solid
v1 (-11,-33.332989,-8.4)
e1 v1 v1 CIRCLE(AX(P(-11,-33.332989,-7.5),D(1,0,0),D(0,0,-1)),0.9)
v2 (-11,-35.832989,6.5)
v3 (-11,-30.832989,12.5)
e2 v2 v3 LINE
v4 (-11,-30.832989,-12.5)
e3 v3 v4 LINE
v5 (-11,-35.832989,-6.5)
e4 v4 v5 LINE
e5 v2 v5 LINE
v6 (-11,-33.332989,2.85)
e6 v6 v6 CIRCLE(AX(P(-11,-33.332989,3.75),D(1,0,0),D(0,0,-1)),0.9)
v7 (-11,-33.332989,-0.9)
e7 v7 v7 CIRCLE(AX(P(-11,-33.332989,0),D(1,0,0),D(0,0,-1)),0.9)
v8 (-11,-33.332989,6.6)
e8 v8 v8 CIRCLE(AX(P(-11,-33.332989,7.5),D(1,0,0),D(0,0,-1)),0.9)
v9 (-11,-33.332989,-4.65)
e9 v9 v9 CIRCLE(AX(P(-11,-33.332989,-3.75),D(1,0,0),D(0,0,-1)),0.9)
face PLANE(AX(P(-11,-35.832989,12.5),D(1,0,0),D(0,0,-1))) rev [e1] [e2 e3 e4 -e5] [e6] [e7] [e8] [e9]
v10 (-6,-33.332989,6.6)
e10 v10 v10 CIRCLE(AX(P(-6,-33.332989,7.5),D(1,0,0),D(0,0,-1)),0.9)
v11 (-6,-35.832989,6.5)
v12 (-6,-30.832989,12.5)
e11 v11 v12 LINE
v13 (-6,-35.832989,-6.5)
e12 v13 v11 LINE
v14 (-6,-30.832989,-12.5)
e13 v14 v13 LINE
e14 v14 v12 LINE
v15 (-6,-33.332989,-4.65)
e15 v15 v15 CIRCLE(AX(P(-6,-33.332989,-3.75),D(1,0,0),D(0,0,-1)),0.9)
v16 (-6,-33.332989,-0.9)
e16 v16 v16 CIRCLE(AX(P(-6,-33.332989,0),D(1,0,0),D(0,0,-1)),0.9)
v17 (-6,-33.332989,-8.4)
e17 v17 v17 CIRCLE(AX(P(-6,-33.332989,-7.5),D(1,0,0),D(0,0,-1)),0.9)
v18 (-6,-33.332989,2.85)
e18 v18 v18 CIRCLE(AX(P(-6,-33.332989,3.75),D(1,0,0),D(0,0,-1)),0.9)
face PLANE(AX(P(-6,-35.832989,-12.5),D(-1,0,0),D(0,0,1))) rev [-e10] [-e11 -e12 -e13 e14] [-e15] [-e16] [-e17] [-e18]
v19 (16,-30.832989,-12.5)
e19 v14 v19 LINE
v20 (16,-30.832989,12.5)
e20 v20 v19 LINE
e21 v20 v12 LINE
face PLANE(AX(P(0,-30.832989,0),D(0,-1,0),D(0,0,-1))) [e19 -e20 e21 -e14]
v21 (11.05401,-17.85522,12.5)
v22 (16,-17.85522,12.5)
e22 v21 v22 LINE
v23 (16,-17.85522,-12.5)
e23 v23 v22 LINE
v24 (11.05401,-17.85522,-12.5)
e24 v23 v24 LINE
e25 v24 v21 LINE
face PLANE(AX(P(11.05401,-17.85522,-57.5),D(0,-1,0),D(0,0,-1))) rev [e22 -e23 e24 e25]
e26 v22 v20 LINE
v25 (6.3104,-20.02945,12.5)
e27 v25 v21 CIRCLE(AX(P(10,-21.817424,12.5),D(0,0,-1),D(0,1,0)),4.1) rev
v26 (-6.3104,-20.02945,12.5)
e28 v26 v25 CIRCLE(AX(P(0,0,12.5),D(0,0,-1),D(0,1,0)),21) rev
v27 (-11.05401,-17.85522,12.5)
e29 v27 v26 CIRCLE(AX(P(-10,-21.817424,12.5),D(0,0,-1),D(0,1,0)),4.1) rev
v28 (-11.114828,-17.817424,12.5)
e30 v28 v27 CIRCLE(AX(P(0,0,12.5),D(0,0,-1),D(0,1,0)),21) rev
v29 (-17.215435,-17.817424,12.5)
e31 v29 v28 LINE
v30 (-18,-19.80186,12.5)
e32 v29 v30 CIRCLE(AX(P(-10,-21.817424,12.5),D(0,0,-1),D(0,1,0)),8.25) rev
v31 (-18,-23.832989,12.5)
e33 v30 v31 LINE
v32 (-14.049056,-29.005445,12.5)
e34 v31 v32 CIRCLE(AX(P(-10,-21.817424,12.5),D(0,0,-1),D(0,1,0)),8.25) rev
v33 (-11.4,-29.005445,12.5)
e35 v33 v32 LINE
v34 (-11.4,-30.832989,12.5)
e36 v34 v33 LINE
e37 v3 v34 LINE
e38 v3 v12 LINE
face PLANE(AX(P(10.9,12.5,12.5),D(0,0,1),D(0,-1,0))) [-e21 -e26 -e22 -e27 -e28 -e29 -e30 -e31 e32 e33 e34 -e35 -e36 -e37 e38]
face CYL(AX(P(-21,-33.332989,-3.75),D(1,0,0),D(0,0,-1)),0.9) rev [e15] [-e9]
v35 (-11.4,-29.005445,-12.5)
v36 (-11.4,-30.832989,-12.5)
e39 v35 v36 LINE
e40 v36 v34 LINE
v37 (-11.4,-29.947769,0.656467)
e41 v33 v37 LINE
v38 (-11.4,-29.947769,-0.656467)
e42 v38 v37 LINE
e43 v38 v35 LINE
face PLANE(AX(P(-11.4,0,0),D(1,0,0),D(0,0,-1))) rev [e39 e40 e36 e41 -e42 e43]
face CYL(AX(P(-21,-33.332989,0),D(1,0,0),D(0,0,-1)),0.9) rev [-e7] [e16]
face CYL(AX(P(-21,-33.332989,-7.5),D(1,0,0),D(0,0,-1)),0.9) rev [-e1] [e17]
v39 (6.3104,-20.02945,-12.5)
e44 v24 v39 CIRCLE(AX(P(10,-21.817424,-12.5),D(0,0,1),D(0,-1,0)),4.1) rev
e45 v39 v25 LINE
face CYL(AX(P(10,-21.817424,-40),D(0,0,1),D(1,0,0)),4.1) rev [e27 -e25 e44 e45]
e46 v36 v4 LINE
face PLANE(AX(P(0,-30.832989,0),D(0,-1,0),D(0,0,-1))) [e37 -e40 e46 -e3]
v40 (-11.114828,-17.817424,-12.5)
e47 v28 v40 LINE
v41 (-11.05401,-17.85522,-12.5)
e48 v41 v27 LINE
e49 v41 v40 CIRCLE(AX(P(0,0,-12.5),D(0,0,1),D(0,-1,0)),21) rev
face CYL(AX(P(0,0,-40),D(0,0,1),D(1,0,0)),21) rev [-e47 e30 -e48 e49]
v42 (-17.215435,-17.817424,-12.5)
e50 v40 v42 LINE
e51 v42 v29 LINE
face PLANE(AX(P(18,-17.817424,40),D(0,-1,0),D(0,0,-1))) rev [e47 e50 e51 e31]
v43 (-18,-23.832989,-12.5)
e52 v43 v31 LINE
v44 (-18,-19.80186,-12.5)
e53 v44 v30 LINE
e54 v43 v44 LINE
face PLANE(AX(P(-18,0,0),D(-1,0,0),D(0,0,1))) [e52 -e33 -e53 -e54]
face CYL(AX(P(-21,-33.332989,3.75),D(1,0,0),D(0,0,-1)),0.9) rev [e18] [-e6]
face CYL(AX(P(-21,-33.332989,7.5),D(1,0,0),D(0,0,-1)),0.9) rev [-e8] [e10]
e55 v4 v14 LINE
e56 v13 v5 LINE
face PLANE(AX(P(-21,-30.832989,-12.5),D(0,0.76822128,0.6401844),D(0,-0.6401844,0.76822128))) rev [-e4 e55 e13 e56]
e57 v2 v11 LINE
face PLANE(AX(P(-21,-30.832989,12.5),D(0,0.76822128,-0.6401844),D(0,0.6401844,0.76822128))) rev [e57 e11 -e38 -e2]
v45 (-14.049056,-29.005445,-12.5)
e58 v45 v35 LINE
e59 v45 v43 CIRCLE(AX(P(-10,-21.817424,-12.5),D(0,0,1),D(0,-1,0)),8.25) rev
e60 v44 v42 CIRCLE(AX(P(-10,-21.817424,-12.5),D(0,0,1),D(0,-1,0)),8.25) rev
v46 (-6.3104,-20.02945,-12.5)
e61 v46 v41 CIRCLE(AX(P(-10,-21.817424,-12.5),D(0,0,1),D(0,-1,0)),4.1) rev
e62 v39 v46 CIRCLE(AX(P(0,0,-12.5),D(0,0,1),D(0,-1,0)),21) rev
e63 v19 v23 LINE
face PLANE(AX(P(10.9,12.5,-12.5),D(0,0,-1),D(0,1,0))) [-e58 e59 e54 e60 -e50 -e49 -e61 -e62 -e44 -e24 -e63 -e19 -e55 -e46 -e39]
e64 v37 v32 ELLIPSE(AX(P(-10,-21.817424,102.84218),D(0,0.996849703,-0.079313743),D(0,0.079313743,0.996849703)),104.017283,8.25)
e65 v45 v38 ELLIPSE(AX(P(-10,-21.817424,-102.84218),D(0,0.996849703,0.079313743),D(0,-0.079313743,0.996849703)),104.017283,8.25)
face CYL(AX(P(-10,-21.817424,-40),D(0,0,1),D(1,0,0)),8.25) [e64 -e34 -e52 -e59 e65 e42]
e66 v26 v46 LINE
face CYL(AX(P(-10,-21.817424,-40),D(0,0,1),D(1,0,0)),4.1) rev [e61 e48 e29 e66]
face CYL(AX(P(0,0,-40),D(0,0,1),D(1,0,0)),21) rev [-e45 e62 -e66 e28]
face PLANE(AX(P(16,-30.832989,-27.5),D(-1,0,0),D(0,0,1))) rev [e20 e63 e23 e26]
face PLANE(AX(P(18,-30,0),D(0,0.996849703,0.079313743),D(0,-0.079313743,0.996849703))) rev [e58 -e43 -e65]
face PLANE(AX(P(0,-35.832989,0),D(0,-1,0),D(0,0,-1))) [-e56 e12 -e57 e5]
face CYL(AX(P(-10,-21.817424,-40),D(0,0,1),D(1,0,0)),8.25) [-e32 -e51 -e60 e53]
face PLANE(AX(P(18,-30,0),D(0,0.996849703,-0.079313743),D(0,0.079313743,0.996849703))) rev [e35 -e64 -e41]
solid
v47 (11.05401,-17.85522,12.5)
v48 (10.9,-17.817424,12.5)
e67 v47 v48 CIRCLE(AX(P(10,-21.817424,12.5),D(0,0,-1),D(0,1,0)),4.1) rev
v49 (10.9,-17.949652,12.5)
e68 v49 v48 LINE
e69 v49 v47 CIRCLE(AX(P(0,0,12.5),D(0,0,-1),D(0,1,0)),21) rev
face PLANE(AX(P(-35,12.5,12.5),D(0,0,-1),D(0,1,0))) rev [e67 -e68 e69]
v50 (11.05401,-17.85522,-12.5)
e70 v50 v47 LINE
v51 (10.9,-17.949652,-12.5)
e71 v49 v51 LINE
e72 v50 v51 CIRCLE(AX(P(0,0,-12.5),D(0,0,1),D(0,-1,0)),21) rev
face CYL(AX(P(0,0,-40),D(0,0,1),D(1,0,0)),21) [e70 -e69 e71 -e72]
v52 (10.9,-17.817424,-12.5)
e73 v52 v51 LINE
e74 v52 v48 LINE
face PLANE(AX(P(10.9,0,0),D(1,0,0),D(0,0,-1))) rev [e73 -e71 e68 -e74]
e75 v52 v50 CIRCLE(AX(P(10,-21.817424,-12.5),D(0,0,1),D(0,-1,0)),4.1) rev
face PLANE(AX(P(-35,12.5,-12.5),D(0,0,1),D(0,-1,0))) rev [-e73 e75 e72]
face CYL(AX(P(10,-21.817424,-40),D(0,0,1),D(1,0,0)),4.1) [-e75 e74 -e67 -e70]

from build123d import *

# Parameters (mm, degrees)
BOSS_EXTRUDE1_DEPTH = 18
CUT_EXTRUDE3_DEPTH  = 88.315519812
BOSS_EXTRUDE2_DEPTH = 15.1
CUT_EXTRUDE5_START  = -40
CUT_EXTRUDE5_DEPTH  = 80
SKETCH11_W          = 45
SKETCH11_H          = 50
CUT_EXTRUDE8_DEPTH  = 35
SKETCH12_W          = 14.945990499
SKETCH12_H          = 30.355219796
CUT_EXTRUDE9_DEPTH  = 70
SKETCH13_W          = 12.4
SKETCH13_H          = 25
BOSS_EXTRUDE3_DEPTH = 7
SKETCH14_W          = 10
SKETCH14_H          = 12.97776887
CUT_EXTRUDE10_DEPTH = 40
SKETCH15_W          = 25
SKETCH15_H          = 1.827543594
BOSS_EXTRUDE4_DEPTH = 25
SKETCH17_W          = 5
SKETCH17_H          = 25
BOSS_EXTRUDE5_DEPTH = 5
CUT_EXTRUDE11_DEPTH = 15
SKETCH19_R          = 0.9
CUT_EXTRUDE12_DEPTH = 15


# Read off the part's stored shape, not the designer's step: Cut-Extrude5
with BuildPart() as part:
    # Sketch2 → Boss-Extrude1 (new, symmetric)
    with BuildSketch(Plane(origin=(0, 0, 0), x_dir=(0, 0, -1), z_dir=(1, 0, 0))):
        Polygon((-40, -26.817424229), (-40, -17.817424229), (40, -17.817424229), (40, -26.817424229), (0, -30), align=None)
    extrude(amount=BOSS_EXTRUDE1_DEPTH, both=True)

    # Sketch3 → Cut-Extrude3 (cut, through all)
    with BuildSketch(Plane.XY.offset(40)):
        with BuildLine():
            Line((-16.562202374, -26.817424229), (-18, -26.817424229))
            Line((-18, -26.817424229), (-18, -30.067424229))
            Line((-18, -30.067424229), (-10, -30.067424229))
            ThreePointArc((-10, -30.067424229), (-13.661454629, -29.210410771), (-16.562202374, -26.817424229))
        make_face()
        with BuildLine():
            ThreePointArc((-16.562202374, -26.817424229), (-17.432438927, -25.398115726), (-18, -23.832988666))
            Line((-18, -23.832988666), (-18, -26.817424229))
            Line((-18, -26.817424229), (-16.562202374, -26.817424229))
        make_face()
        with BuildLine():
            Line((-17.215434845, -17.817424229), (-18, -17.817424229))
            Line((-18, -17.817424229), (-18, -19.801859792))
            ThreePointArc((-18, -19.801859792), (-17.672148363, -18.784168636), (-17.215434845, -17.817424229))
        make_face()
        with BuildLine():
            ThreePointArc((16.562202374, -26.817424229), (13.661454629, -29.210410771), (10, -30.067424229))
            Line((10, -30.067424229), (18, -30.067424229))
            Line((18, -30.067424229), (18, -26.817424229))
            Line((18, -26.817424229), (16.562202374, -26.817424229))
        make_face()
        with BuildLine():
            ThreePointArc((10.138510435, -17.817424229), (10.216403484, -17.772875396), (10.294100789, -17.727986037))
            ThreePointArc((10.294100789, -17.727986037), (9.693767636, -17.728876597), (9.1, -17.817424229))
            Line((9.1, -17.817424229), (10.138510435, -17.817424229))
        make_face()
        with BuildLine():
            ThreePointArc((10.9, -17.817424229), (10.598722783, -17.761375533), (10.294100789, -17.727986037))
            ThreePointArc((10.294100789, -17.727986037), (10.216403484, -17.772875396), (10.138510435, -17.817424229))
            Line((10.138510435, -17.817424229), (10.9, -17.817424229))
        make_face()
        with BuildLine():
            Line((10.138510435, -17.817424229), (9.1, -17.817424229))
            ThreePointArc((9.1, -17.817424229), (7.76570517, -18.379703093), (6.710065877, -19.370725746))
            ThreePointArc((6.710065877, -19.370725746), (8.460012845, -18.672926462), (10.138510435, -17.817424229))
        make_face()
        with BuildLine():
            ThreePointArc((14.1, -21.817424229), (13.201562119, -19.256174534), (10.9, -17.817424229))
            Line((10.9, -17.817424229), (10.138510435, -17.817424229))
            ThreePointArc((10.138510435, -17.817424229), (8.460012845, -18.672926462), (6.710065877, -19.370725746))
            ThreePointArc((6.710065877, -19.370725746), (8.711343704, -25.709642742), (14.1, -21.817424229))
        make_face()
        with BuildLine():
            Line((-10.138510435, -17.817424229), (-10.9, -17.817424229))
            ThreePointArc((-10.9, -17.817424229), (-12.561249695, -25.018986348), (-5.9, -21.817424229))
            ThreePointArc((-5.9, -21.817424229), (-6.107781487, -20.528767934), (-6.710065877, -19.370725746))
            ThreePointArc((-6.710065877, -19.370725746), (-8.460012845, -18.672926462), (-10.138510435, -17.817424229))
        make_face()
        with BuildLine():
            ThreePointArc((-10.294100789, -17.727986037), (-10.598722783, -17.761375533), (-10.9, -17.817424229))
            Line((-10.9, -17.817424229), (-10.138510435, -17.817424229))
            ThreePointArc((-10.138510435, -17.817424229), (-10.216403484, -17.772875396), (-10.294100789, -17.727986037))
        make_face()
        with BuildLine():
            ThreePointArc((-9.1, -17.817424229), (-9.693767636, -17.728876597), (-10.294100789, -17.727986037))
            ThreePointArc((-10.294100789, -17.727986037), (-10.216403484, -17.772875396), (-10.138510435, -17.817424229))
            Line((-10.138510435, -17.817424229), (-9.1, -17.817424229))
        make_face()
        with BuildLine():
            Line((-9.1, -17.817424229), (-10.138510435, -17.817424229))
            ThreePointArc((-10.138510435, -17.817424229), (-8.460012845, -18.672926462), (-6.710065877, -19.370725746))
            ThreePointArc((-6.710065877, -19.370725746), (-7.76570517, -18.379703093), (-9.1, -17.817424229))
        make_face()
        with BuildLine():
            ThreePointArc((18, -23.832988666), (17.432438927, -25.398115726), (16.562202374, -26.817424229))
            Line((16.562202374, -26.817424229), (18, -26.817424229))
            Line((18, -26.817424229), (18, -23.832988666))
        make_face()
        with BuildLine():
            ThreePointArc((-14.244209612, -14.742879384), (-15.932458957, -16.084324655), (-17.215434845, -17.817424229))
            Line((-17.215434845, -17.817424229), (-10.9, -17.817424229))
            ThreePointArc((-10.9, -17.817424229), (-10.598722783, -17.761375533), (-10.294100789, -17.727986037))
            ThreePointArc((-10.294100789, -17.727986037), (-12.359606983, -16.355125045), (-14.244209612, -14.742879384))
        make_face()
        with BuildLine():
            ThreePointArc((-2.784565155, -17.817424229), (-7.86218538, -13.849221882), (-14.244209612, -14.742879384))
            ThreePointArc((-14.244209612, -14.742879384), (-12.359606983, -16.355125045), (-10.294100789, -17.727986037))
            ThreePointArc((-10.294100789, -17.727986037), (-9.693767636, -17.728876597), (-9.1, -17.817424229))
            Line((-9.1, -17.817424229), (-2.784565155, -17.817424229))
        make_face()
        with BuildLine():
            ThreePointArc((-1.870156707, -20.414517234), (-2.21825127, -19.077554396), (-2.784565155, -17.817424229))
            Line((-2.784565155, -17.817424229), (-9.1, -17.817424229))
            ThreePointArc((-9.1, -17.817424229), (-7.76570517, -18.379703093), (-6.710065877, -19.370725746))
            ThreePointArc((-6.710065877, -19.370725746), (-4.321739241, -20.039275684), (-1.870156707, -20.414517234))
        make_face()
        with BuildLine():
            ThreePointArc((20.5, 0), (-8.007612096, 18.871357888), (-14.244209612, -14.742879384))
            ThreePointArc((-14.244209612, -14.742879384), (-7.86218538, -13.849221882), (-2.784565155, -17.817424229))
            Line((-2.784565155, -17.817424229), (2.784565155, -17.817424229))
            ThreePointArc((2.784565155, -17.817424229), (7.86218538, -13.849221882), (14.244209612, -14.742879384))
            ThreePointArc((14.244209612, -14.742879384), (18.871357888, -8.007612096), (20.5, 0))
        make_face()
        with BuildLine():
            Line((2.784565155, -17.817424229), (-2.784565155, -17.817424229))
            ThreePointArc((-2.784565155, -17.817424229), (-2.21825127, -19.077554396), (-1.870156707, -20.414517234))
            ThreePointArc((-1.870156707, -20.414517234), (0, -20.5), (1.870156707, -20.414517234))
            ThreePointArc((1.870156707, -20.414517234), (2.21825127, -19.077554396), (2.784565155, -17.817424229))
        make_face()
        with BuildLine():
            ThreePointArc((17.215434845, -17.817424229), (15.932458957, -16.084324655), (14.244209612, -14.742879384))
            ThreePointArc((14.244209612, -14.742879384), (12.359606983, -16.355125045), (10.294100789, -17.727986037))
            ThreePointArc((10.294100789, -17.727986037), (10.598722783, -17.761375533), (10.9, -17.817424229))
            Line((10.9, -17.817424229), (17.215434845, -17.817424229))
        make_face()
        with BuildLine():
            ThreePointArc((10.294100789, -17.727986037), (12.359606983, -16.355125045), (14.244209612, -14.742879384))
            ThreePointArc((14.244209612, -14.742879384), (7.86218538, -13.849221882), (2.784565155, -17.817424229))
            Line((2.784565155, -17.817424229), (9.1, -17.817424229))
            ThreePointArc((9.1, -17.817424229), (9.693767636, -17.728876597), (10.294100789, -17.727986037))
        make_face()
        with BuildLine():
            Line((9.1, -17.817424229), (2.784565155, -17.817424229))
            ThreePointArc((2.784565155, -17.817424229), (2.21825127, -19.077554396), (1.870156707, -20.414517234))
            ThreePointArc((1.870156707, -20.414517234), (4.321739241, -20.039275684), (6.710065877, -19.370725746))
            ThreePointArc((6.710065877, -19.370725746), (7.76570517, -18.379703093), (9.1, -17.817424229))
        make_face()
    extrude(amount=-CUT_EXTRUDE3_DEPTH, mode=Mode.SUBTRACT)

    # Sketch5 → Boss-Extrude2 (add)
    with BuildSketch(Plane(origin=(26, 0, 0), x_dir=(0, 0, -1), z_dir=(1, 0, 0))):
        Polygon((12.5, 12.5), (-12.5, 12.5), (-12.5, 0), (-40, -17.817424229), (-40, -23.832988666), (40, -23.832988666), (40, -17.817424229), (12.5, 0), align=None)
    extrude(amount=-BOSS_EXTRUDE2_DEPTH)

    # Cut-Extrude5 outline → Cut-Extrude5 (cut)
    with BuildSketch(Plane.XY.offset(CUT_EXTRUDE5_START)):
        with BuildLine():
            Line((10.9, -23.832988666), (13.570364127, -23.832988666))
            ThreePointArc((13.570364127, -23.832988666), (13.778840831, -20.226713077), (11.054009501, -17.855219796))
            ThreePointArc((11.054009501, -17.855219796), (10.977106296, -17.902601413), (10.9, -17.949651807))
            Line((10.9, -17.949651807), (10.9, -23.832988666))
        make_face()
        with BuildLine():
            ThreePointArc((-11.114827657, -17.817424229), (-11.084434688, -17.836347935), (-11.054009501, -17.855219796))
            ThreePointArc((-11.054009501, -17.855219796), (-10.977187499, -17.835577347), (-10.9, -17.817424229))
            Line((-10.9, -17.817424229), (-11.114827657, -17.817424229))
        make_face()
        with BuildLine():
            ThreePointArc((-6.310400221, -20.029449544), (0, -21), (6.310400221, -20.029449544))
            ThreePointArc((6.310400221, -20.029449544), (6.494725028, -19.690678506), (6.710065877, -19.370725746))
            ThreePointArc((6.710065877, -19.370725746), (0, -20.5), (-6.710065877, -19.370725746))
            ThreePointArc((-6.710065877, -19.370725746), (-6.494725028, -19.690678506), (-6.310400221, -20.029449544))
        make_face()
        with BuildLine():
            ThreePointArc((10.9, -17.817424229), (10.977187499, -17.835577347), (11.054009501, -17.855219796))
            ThreePointArc((11.054009501, -17.855219796), (20.624276231, -3.954646627), (16.874537031, 12.5))
            Line((16.874537031, 12.5), (10.9, 12.5))
            Line((10.9, 12.5), (10.9, -17.817424229))
        make_face()
    extrude(amount=CUT_EXTRUDE5_DEPTH, mode=Mode.SUBTRACT)

    # Sketch11 → Cut-Extrude8 (cut, symmetric)
    with BuildSketch(Plane(origin=(0, 0, 0), x_dir=(0, 0, -1), z_dir=(1, 0, 0))):
        with Locations((-35, -12.5)):
            Rectangle(SKETCH11_W, SKETCH11_H)
        with Locations((35, -12.5)):
            Rectangle(SKETCH11_W, SKETCH11_H)
    extrude(amount=CUT_EXTRUDE8_DEPTH, both=True, mode=Mode.SUBTRACT)

    # Sketch12 → Cut-Extrude9 (cut)
    with BuildSketch(Plane.XY.offset(12.5)):
        with Locations((18.527004751, -2.677609898)):
            Rectangle(SKETCH12_W, SKETCH12_H)
    extrude(amount=-CUT_EXTRUDE9_DEPTH, mode=Mode.SUBTRACT)

    # Sketch13 → Boss-Extrude3 (add)
    with BuildSketch(Plane.XZ.offset(23.832988666)):
        with Locations((19.8, 0)):
            Rectangle(SKETCH13_W, SKETCH13_H)
    extrude(amount=BOSS_EXTRUDE3_DEPTH)

    # Sketch14 → Cut-Extrude10 (cut)
    with BuildSketch(Plane.XY.offset(12.5)):
        with Locations((21, -24.344104231)):
            Rectangle(SKETCH14_W, SKETCH14_H)
    extrude(amount=-CUT_EXTRUDE10_DEPTH, mode=Mode.SUBTRACT)

    # Sketch15 → Boss-Extrude4 (add)
    with BuildSketch(Plane.ZY.offset(-13.6)):
        with Locations((0, -29.919216869)):
            Rectangle(SKETCH15_W, SKETCH15_H)
    extrude(amount=BOSS_EXTRUDE4_DEPTH)

    # Sketch17 → Boss-Extrude5 (add)
    with BuildSketch(Plane(origin=(0, -30.832988666, 0), x_dir=(-1, 0, 0), z_dir=(0, -1, 0))):
        with Locations((8.5, 0)):
            Rectangle(SKETCH17_W, SKETCH17_H)
    extrude(amount=BOSS_EXTRUDE5_DEPTH)

    # Sketch18 → Cut-Extrude11 (cut)
    with BuildSketch(Plane(origin=(-6, 0, 0), x_dir=(0, 0, -1), z_dir=(1, 0, 0))):
        Polygon((12.5, -30.832988666), (6.5, -35.832988666), (12.5, -35.832988666), align=None)
        Polygon((-6.5, -35.832988666), (-12.5, -35.832988666), (-12.5, -30.832988666), align=None)
    extrude(amount=-CUT_EXTRUDE11_DEPTH, mode=Mode.SUBTRACT)

    # Sketch19 → Cut-Extrude12 (cut)
    with BuildSketch(Plane(origin=(-6, 0, 0), x_dir=(0, 0, -1), z_dir=(1, 0, 0))):
        with Locations((-7.5, -33.332988666)):
            Circle(SKETCH19_R)
        with Locations((-3.75, -33.332988666)):
            Circle(SKETCH19_R)
        with Locations((0, -33.332988666)):
            Circle(SKETCH19_R)
        with Locations((3.75, -33.332988666)):
            Circle(SKETCH19_R)
        with Locations((7.5, -33.332988666)):
            Circle(SKETCH19_R)
    extrude(amount=-CUT_EXTRUDE12_DEPTH, mode=Mode.SUBTRACT)


solid = part.part
